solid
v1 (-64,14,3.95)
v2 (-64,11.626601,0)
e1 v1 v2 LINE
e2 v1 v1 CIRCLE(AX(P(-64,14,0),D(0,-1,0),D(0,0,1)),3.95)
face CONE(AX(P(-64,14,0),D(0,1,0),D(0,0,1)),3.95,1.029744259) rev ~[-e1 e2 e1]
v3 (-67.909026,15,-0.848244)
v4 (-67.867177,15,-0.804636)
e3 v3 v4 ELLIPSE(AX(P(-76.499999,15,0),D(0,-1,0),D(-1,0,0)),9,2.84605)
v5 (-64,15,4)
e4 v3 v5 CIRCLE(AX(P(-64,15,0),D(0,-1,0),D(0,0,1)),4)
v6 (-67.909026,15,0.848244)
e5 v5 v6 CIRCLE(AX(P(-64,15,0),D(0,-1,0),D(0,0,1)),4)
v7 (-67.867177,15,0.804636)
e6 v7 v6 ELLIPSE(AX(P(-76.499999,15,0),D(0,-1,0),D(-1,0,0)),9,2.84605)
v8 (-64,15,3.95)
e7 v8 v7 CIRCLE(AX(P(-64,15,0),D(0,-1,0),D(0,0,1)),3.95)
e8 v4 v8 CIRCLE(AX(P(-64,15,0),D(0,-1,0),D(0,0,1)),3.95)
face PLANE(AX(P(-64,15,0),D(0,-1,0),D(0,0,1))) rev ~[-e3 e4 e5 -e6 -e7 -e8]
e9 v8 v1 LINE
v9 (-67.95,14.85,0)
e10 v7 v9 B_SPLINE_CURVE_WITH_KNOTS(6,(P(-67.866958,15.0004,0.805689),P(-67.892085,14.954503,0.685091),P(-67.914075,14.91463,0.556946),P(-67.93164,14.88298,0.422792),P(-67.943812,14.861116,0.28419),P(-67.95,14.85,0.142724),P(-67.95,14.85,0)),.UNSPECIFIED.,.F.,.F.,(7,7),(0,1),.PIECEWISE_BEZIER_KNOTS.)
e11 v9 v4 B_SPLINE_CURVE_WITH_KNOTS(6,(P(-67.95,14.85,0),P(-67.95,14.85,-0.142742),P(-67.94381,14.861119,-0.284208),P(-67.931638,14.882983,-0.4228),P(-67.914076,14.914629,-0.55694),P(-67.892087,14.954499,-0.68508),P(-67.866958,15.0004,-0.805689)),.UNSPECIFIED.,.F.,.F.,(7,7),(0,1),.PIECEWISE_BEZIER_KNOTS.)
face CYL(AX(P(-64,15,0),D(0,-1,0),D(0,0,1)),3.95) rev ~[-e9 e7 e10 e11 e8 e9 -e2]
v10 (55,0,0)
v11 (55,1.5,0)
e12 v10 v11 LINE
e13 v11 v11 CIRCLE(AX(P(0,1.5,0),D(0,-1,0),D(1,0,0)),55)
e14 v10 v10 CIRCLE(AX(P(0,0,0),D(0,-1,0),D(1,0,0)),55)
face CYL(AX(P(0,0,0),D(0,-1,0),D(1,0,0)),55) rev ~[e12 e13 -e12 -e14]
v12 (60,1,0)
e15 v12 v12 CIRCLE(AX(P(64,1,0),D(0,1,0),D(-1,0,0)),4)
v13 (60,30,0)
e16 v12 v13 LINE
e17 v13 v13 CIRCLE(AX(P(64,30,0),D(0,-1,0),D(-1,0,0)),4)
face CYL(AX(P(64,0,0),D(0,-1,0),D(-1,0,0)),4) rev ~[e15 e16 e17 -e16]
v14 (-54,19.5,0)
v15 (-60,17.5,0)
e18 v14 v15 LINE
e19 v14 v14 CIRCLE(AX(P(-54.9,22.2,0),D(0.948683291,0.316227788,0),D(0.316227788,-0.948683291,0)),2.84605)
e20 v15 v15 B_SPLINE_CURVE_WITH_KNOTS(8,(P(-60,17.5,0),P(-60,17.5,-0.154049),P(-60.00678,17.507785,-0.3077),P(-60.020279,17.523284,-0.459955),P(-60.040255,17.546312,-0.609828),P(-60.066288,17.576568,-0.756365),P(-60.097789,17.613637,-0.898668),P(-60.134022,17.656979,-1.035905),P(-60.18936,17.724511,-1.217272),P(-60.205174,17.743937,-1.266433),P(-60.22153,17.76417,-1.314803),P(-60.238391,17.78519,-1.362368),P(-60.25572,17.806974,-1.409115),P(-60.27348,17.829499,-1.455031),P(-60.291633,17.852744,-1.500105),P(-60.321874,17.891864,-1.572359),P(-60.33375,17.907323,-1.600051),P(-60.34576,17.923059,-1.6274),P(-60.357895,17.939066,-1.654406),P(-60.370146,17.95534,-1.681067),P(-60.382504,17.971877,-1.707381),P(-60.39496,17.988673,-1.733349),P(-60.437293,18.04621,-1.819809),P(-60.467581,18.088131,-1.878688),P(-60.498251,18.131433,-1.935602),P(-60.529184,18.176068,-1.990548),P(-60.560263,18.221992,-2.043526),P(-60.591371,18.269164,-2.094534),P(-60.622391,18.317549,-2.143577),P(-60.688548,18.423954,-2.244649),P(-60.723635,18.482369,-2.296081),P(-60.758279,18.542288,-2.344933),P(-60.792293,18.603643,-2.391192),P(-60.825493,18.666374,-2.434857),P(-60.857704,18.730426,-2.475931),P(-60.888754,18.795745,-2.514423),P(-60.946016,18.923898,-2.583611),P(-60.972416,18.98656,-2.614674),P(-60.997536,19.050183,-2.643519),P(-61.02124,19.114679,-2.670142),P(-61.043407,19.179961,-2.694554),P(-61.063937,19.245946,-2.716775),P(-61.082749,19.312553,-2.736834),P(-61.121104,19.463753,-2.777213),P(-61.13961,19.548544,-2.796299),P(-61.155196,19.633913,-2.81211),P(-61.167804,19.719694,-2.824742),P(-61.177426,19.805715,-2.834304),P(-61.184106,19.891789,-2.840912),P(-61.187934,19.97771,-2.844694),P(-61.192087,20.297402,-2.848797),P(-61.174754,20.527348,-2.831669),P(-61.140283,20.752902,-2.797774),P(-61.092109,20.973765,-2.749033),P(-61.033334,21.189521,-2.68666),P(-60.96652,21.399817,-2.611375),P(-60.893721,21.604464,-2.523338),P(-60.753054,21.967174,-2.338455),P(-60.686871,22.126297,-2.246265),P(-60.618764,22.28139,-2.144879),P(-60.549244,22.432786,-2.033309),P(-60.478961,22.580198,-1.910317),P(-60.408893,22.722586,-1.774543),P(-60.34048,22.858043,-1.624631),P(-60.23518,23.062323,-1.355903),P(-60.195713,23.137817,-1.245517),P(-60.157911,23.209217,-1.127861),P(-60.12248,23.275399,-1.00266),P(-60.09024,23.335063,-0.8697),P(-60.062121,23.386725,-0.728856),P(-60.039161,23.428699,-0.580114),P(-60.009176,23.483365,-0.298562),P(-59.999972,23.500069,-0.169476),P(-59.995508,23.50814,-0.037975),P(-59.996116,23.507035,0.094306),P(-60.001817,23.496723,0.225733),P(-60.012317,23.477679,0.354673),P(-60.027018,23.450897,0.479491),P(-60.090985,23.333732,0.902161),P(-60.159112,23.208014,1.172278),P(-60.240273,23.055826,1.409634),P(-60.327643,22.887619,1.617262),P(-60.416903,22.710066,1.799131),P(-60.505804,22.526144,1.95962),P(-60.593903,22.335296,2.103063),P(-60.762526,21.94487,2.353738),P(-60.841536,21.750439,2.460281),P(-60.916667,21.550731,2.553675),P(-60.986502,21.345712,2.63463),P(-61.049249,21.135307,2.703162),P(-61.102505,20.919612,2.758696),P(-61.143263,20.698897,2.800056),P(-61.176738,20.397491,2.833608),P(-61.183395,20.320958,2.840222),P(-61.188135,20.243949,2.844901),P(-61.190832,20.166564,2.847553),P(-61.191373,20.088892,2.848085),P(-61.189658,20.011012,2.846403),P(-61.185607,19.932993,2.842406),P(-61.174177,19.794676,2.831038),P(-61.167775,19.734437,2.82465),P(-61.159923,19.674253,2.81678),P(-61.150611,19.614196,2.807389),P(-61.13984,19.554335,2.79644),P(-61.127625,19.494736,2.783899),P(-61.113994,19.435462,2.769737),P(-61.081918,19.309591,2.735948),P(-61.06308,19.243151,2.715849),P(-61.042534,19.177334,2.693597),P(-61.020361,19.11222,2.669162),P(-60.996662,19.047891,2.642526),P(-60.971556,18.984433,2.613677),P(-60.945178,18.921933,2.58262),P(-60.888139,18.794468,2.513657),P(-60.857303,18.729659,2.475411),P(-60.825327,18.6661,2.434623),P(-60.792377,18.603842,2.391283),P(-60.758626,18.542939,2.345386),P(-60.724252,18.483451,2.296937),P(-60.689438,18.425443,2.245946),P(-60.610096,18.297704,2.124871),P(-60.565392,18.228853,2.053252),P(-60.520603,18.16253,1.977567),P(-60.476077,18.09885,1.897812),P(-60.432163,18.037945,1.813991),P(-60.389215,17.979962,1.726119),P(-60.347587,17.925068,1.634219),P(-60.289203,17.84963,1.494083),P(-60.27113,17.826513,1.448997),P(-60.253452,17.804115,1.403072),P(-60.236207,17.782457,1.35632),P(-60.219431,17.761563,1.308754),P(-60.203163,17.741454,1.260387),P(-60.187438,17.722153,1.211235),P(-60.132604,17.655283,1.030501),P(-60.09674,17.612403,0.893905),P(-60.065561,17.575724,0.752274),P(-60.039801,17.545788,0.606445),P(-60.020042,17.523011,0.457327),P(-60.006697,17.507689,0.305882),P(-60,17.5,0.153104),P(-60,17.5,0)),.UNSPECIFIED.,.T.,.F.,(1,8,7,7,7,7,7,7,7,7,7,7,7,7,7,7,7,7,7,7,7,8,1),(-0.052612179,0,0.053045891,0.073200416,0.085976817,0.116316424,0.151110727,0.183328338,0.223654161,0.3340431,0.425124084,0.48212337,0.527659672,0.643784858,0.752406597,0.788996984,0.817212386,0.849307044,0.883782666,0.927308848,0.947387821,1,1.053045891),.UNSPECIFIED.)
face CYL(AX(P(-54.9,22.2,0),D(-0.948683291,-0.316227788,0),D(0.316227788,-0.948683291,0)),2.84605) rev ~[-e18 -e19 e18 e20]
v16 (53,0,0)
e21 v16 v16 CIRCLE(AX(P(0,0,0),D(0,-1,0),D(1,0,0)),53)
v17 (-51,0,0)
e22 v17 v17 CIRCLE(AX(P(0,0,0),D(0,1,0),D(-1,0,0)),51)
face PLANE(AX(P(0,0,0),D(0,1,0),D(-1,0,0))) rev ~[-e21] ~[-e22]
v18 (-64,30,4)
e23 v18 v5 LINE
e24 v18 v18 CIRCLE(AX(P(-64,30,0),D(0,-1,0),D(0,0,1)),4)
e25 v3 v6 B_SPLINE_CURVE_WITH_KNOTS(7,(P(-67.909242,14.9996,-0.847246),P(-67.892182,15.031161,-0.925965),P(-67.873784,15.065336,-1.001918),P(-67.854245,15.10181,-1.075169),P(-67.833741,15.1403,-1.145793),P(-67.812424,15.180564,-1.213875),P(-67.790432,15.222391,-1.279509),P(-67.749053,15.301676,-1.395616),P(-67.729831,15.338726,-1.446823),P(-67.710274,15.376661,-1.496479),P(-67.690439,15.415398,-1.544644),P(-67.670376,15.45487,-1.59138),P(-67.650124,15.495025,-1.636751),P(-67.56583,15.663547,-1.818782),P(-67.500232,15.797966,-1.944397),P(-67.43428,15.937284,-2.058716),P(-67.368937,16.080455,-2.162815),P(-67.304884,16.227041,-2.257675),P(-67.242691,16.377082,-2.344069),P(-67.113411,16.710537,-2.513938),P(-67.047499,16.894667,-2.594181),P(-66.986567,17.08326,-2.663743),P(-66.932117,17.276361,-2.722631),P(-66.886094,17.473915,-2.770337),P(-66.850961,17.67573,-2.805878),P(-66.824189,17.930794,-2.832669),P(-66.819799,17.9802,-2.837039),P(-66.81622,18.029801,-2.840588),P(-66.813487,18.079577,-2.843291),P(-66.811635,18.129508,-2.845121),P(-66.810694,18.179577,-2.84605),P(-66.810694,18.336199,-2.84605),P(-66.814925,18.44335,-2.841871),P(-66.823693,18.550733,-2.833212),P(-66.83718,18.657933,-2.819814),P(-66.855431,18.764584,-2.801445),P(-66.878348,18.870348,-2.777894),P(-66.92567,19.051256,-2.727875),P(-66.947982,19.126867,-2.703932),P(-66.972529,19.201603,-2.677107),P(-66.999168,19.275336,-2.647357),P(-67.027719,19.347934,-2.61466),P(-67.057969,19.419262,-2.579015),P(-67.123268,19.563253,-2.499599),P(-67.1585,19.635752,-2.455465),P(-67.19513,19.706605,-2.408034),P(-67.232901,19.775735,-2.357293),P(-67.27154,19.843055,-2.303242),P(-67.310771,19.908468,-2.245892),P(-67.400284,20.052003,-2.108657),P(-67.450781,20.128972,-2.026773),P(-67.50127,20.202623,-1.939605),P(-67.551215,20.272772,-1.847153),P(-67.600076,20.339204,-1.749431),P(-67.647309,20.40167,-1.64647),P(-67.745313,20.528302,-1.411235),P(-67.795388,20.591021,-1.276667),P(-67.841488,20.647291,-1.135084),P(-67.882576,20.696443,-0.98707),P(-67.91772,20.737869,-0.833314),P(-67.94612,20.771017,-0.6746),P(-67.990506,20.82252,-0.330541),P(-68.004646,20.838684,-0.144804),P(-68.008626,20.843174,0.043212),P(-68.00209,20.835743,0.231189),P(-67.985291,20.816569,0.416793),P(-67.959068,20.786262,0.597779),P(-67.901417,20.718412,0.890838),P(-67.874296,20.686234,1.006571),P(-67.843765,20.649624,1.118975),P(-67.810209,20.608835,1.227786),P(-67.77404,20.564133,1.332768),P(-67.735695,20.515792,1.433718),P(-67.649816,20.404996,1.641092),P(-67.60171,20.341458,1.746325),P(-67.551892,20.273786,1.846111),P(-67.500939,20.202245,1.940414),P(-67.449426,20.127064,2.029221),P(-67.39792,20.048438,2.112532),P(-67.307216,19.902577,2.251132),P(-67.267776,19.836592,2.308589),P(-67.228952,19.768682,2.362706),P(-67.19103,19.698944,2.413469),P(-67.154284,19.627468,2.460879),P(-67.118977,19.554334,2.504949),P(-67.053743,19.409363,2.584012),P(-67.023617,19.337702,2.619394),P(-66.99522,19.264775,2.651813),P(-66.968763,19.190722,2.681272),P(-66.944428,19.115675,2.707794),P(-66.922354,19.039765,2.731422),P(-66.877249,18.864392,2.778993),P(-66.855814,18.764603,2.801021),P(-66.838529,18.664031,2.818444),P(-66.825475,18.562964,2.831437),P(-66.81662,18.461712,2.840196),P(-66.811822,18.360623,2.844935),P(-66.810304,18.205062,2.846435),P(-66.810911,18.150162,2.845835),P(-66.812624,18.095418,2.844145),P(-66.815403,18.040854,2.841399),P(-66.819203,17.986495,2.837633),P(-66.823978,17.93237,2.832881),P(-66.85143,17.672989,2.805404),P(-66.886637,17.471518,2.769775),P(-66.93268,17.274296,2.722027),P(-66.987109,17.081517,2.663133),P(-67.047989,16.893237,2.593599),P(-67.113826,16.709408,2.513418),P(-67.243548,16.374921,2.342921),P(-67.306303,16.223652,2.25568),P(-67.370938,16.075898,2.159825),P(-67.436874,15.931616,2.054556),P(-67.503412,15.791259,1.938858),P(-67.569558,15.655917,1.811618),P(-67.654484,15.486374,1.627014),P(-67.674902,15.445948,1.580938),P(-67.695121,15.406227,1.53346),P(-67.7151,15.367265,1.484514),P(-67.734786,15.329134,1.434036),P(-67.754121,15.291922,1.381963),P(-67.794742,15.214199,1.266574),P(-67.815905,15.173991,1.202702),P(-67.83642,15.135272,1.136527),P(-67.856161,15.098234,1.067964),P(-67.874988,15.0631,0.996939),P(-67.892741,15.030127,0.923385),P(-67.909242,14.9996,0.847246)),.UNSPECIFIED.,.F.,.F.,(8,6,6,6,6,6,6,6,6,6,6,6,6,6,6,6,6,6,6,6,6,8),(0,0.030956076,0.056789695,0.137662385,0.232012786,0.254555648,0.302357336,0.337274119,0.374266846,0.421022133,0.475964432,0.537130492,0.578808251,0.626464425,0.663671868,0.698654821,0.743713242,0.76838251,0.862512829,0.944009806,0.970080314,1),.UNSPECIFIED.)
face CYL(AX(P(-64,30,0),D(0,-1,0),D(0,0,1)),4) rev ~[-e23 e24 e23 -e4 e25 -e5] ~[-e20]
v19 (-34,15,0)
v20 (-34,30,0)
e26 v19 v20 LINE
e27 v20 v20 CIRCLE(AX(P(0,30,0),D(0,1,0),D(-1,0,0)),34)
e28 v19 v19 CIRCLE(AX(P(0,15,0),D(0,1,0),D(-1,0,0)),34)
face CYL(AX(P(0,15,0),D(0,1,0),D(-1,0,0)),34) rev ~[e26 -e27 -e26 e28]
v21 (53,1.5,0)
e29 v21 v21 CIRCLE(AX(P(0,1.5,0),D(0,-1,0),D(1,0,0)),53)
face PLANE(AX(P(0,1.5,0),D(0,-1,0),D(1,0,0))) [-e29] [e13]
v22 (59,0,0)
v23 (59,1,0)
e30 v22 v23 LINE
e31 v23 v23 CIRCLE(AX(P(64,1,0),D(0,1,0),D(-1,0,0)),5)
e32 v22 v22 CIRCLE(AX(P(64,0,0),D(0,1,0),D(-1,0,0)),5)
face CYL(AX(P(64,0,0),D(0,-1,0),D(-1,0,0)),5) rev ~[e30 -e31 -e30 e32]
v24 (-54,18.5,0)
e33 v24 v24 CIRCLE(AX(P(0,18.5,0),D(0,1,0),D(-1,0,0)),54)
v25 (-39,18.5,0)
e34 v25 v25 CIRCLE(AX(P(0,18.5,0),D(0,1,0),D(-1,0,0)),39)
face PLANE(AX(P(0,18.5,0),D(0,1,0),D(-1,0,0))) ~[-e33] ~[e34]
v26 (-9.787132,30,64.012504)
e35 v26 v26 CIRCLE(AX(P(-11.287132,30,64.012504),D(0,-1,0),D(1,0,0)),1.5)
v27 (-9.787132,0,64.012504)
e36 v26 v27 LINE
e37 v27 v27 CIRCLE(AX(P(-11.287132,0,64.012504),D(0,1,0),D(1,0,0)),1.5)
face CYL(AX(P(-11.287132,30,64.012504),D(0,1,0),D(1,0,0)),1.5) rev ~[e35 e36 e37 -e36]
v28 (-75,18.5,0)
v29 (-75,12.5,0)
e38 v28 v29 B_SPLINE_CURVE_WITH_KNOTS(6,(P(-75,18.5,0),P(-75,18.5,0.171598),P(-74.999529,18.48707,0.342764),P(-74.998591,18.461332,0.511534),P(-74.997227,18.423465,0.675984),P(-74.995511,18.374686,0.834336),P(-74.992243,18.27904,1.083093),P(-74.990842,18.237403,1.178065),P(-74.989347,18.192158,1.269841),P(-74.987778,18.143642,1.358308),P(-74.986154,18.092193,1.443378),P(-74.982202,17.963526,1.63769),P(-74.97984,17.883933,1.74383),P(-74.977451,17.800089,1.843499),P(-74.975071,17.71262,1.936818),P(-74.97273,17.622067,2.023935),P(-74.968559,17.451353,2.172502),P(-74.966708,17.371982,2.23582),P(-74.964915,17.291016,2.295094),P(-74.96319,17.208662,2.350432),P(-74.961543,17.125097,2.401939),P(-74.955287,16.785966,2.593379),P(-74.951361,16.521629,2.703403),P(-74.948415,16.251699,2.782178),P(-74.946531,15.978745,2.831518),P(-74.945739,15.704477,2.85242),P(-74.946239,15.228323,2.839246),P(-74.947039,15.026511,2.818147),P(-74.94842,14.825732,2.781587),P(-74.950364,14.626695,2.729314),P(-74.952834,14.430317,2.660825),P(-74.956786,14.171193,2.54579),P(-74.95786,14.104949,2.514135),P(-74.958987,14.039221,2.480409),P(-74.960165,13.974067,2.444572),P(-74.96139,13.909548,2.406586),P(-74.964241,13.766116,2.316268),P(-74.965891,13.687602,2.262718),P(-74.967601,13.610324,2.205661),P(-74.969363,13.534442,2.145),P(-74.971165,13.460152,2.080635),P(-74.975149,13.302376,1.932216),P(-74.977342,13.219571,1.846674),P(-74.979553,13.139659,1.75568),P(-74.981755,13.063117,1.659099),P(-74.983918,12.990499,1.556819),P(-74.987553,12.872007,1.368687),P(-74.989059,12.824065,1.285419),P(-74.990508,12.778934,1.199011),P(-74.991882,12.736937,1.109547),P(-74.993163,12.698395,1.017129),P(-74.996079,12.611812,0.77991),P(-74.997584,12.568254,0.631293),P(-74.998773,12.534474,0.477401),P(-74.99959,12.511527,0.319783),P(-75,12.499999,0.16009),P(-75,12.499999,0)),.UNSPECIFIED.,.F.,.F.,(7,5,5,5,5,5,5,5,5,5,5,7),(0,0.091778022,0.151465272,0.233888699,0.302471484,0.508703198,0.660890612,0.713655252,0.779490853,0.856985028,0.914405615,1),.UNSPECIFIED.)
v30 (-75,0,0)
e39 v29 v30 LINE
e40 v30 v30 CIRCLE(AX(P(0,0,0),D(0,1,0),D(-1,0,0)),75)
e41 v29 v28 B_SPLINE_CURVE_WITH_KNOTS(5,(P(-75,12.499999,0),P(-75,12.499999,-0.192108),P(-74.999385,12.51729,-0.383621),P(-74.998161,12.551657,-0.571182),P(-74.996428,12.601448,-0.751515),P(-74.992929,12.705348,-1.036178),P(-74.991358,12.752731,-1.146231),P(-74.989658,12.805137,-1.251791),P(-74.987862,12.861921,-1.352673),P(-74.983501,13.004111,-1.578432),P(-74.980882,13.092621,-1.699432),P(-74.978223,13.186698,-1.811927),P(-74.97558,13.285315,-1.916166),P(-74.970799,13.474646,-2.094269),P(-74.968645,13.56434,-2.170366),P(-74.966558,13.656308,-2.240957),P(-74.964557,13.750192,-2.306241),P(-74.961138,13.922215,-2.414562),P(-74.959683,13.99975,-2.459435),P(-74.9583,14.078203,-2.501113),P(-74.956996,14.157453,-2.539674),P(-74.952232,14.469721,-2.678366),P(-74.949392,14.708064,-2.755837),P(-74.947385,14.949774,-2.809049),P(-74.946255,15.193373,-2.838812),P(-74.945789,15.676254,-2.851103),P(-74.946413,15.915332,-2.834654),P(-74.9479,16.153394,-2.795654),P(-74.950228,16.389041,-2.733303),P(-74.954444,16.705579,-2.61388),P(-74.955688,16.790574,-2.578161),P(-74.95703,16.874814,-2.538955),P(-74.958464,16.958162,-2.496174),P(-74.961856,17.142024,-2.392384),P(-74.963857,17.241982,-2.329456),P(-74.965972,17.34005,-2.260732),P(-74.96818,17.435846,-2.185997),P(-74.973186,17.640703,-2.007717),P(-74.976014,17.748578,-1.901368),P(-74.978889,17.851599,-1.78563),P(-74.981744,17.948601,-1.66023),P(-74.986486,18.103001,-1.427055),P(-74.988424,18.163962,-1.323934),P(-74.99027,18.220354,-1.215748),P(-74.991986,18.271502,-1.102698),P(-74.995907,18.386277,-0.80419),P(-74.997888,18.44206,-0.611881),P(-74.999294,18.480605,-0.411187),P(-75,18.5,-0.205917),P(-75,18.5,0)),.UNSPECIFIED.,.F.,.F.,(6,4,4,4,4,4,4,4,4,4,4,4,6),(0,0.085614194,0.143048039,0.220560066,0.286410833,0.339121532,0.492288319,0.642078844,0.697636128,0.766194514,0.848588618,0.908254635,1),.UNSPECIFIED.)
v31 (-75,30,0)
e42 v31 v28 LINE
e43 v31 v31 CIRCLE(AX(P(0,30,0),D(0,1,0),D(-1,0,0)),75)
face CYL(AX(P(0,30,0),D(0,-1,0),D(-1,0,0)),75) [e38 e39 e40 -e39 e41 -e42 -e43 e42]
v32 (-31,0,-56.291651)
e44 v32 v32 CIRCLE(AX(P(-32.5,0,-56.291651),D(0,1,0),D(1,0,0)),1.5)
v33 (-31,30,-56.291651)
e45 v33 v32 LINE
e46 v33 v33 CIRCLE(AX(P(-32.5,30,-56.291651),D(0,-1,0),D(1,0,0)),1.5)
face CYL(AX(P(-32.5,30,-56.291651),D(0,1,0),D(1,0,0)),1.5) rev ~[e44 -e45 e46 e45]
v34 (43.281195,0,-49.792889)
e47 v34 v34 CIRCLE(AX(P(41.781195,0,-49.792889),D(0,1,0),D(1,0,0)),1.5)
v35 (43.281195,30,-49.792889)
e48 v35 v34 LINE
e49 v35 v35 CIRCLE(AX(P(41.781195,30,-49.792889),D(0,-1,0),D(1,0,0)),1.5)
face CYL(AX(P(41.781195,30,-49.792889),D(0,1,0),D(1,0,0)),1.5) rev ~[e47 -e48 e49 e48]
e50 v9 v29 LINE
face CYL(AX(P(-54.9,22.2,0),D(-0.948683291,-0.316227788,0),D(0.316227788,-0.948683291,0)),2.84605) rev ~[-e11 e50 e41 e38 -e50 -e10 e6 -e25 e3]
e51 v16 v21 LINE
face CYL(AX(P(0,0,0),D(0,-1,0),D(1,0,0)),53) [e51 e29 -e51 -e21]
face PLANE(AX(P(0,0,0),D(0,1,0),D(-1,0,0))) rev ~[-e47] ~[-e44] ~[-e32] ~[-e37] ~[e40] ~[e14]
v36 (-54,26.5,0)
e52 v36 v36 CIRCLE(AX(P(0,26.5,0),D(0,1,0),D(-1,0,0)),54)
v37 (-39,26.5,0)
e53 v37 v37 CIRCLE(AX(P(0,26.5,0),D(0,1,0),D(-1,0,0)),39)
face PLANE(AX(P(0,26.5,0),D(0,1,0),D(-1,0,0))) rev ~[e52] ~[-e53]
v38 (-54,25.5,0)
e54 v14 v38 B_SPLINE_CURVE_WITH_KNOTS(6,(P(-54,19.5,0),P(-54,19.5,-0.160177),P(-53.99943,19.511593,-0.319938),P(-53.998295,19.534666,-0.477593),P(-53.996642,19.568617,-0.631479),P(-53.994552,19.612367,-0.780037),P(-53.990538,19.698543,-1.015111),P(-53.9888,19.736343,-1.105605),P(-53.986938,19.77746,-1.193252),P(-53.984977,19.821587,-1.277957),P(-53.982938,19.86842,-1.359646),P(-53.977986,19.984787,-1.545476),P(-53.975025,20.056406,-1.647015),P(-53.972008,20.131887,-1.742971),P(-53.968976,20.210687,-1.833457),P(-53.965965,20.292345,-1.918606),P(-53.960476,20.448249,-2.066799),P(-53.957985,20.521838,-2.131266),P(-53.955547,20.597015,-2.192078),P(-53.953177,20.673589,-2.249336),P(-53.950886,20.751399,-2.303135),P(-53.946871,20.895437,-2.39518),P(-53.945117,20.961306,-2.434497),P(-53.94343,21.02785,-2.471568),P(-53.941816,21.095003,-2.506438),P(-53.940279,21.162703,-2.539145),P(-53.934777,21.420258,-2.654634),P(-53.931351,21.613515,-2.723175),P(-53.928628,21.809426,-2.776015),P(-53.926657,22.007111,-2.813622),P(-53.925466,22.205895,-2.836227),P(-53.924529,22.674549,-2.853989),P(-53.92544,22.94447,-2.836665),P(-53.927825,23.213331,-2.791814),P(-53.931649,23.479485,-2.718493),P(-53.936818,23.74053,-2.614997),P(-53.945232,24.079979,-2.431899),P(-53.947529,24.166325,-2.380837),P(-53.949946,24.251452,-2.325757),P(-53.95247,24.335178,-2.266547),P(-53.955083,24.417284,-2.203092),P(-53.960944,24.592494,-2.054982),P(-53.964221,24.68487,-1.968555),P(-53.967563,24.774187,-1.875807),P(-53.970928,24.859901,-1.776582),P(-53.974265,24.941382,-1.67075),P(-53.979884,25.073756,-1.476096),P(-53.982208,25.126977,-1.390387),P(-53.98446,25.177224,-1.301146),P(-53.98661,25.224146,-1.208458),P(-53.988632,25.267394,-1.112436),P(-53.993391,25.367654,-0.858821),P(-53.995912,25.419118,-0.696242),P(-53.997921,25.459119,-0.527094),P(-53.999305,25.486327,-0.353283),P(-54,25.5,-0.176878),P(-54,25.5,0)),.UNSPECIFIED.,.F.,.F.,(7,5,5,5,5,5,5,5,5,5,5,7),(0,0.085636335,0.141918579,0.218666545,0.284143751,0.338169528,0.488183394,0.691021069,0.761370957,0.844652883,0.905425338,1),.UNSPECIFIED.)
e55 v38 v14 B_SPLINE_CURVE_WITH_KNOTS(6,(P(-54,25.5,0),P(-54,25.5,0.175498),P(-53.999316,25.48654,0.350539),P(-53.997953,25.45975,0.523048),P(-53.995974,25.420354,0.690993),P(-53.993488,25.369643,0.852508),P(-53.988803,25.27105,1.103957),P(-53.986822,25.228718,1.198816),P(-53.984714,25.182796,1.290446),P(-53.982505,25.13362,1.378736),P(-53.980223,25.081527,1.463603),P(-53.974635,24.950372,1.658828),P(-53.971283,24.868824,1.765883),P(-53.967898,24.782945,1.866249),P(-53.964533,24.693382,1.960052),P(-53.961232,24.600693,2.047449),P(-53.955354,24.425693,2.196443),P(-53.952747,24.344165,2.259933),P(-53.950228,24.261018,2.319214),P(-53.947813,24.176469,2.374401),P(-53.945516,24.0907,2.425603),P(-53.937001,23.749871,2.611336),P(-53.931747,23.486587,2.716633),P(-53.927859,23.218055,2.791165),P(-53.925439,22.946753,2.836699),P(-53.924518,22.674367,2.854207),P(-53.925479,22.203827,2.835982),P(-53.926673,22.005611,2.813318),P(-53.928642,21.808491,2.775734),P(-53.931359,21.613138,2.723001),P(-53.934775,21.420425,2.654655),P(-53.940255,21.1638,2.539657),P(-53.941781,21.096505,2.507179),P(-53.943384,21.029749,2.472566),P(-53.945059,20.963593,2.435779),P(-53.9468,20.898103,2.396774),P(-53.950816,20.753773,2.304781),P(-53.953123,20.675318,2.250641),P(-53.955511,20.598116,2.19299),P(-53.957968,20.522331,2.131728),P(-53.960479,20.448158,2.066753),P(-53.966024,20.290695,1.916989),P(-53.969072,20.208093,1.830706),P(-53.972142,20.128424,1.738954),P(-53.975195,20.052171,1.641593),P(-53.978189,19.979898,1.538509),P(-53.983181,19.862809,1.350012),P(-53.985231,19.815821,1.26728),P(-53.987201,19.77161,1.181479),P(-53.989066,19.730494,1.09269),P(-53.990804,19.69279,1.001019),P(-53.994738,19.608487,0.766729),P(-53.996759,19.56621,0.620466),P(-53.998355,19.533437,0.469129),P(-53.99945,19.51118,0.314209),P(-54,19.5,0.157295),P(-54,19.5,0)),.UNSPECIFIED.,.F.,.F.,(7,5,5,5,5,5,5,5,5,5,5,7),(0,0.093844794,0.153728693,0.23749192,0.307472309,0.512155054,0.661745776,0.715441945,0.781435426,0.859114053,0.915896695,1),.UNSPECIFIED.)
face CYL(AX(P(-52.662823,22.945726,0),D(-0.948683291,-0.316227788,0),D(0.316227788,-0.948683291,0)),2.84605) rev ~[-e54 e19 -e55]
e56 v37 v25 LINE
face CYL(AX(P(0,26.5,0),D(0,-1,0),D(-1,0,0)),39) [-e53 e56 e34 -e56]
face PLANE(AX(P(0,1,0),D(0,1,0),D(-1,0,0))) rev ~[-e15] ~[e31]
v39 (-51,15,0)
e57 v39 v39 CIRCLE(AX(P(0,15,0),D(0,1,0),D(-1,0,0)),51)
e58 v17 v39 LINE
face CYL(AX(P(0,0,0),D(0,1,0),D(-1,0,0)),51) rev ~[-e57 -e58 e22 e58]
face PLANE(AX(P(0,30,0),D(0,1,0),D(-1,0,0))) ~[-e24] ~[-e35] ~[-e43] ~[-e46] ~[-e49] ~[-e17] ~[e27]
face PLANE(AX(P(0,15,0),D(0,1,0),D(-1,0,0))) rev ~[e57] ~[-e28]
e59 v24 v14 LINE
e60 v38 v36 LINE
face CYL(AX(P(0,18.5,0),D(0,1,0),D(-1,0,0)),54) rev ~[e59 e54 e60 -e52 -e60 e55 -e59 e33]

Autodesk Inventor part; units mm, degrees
ref_plane "YZ Plane" through (0, 0, 0) normal (1, 0, 0) x (0, 1, 0)
ref_plane "XZ Plane" through (0, 0, 0) normal (0, 1, 0) x (-1, 0, 0)
ref_plane "XY Plane" through (0, 0, 0) normal (0, 0, 1) x (1, 0, 0)
sketch "Эскиз1" plane through (0, 0, 0) normal (0, 0, 1) x (1, 0, 0)
  line L0 (0, 0) -> (0, 20)
  line L1 (0, 0) -> (0, 24)
  line L2 (0, 0) -> (0, 30)
  line L3 (0, 30) -> (-75, 30)
  line L4 (-75, 30) -> (-75, 0)
  line L5 (-75, 0) -> (-51, 0)
  line L6 (-51, 0) -> (-51, 15)
  line L7 (-51, 15) -> (-34, 15)
  line L8 (-34, 15) -> (-34, 30)
  line L9 (-54, 26.5) -> (-39, 26.5)
  line L10 (-39, 26.5) -> (-39, 18.5)
  line L11 (-39, 18.5) -> (-54, 18.5)
  line L12 (-54, 18.5) -> (-54, 26.5)
  dimension "d20" = 30
  dimension "d21" = 75
  dimension "d22" = 24
  dimension "d23" = 15
  dimension "d24" = 17
  dimension "d46" = 8
  dimension "d47" = 3.5
revolve "Вращение1" add sketch "Эскиз1" angle 360 about axis through (0, 0, 0) along (0, 1, 0)
sketch "Эскиз2" plane through (0, 30, 0) normal (0, 1, 0) x (1, 0, 0)
  circle A0 centre (0, 0) radius 32
  circle A1 centre (0, 0) radius 69
  line L0 (0, 0) -> (41.781195, 49.792889)
  line L1 (0, 0) -> (65, 0) construction
  circle A2 centre (41.781195, 49.792889) radius 1.5
  line L2 (0, 0) -> (-32.5, 56.291651)
  line L3 (0, 0) -> (65, 0) construction
  circle A3 centre (-32.5, 56.291651) radius 1.5
  line L4 (0, 0) -> (-11.287132, -64.012504)
  line L5 (0, 0) -> (65, 0) construction
  circle A4 centre (-11.287132, -64.012504) radius 1.5
  dimension "d8" = 65
  dimension "d9" = 50
  dimension "d10" = 3
  dimension "d11" = 65
  dimension "d12" = 120
  dimension "d13" = 3
  dimension "d14" = 65
  dimension "d15" = 100
  dimension "d16" = 3
extrude "Выдавливание1" cut sketch "Эскиз2" against normal through all contours A2 | A3 | A4
sketch "Эскиз3" plane through (0, 0, 0) normal (0, 1, 0) x (-1, 0, 0)
  circle A0 centre (11.287132, 64.012504) radius 1.5
  circle A1 centre (-41.781195, -49.792889) radius 1.5
  circle A2 centre (32.5, -56.291651) radius 1.5
  circle A3 centre (0, 0) radius 75
  circle A4 centre (0, 0) radius 34
  circle A5 centre (-64, 0) radius 4
  dimension "d44" = 64
  dimension "d45" = 8
extrude "Выдавливание2" cut sketch "Эскиз3" along normal through all contours A5
sketch "Эскиз4" plane through (0, 0, 0) normal (0, 1, 0) x (-1, 0, 0)
  circle A0 centre (-64, 0) radius 4 projected
  circle A1 centre (-64, 0) radius 5
  point P0 (0, 0)
  dimension "d27" = 10
extrude "Выдавливание3" cut sketch "Эскиз4" along normal blind 1
sketch "Эскиз5" plane through (0, 30, 0) normal (0, 1, 0) x (-1, 0, 0)
  line L0 (0, 0) -> (64, 0)
  dimension "d30" = 64
hole "Отверстие1" at (-64, 30, 0) direction (0, -1, 0) diameter 7.9 depth 16 tip angle 118 counterbore diameter 8 counterbore depth 15
sketch "Эскиз6" plane through (0, 0, 0) normal (0, 0, 1) x (1, 0, 0)
  line L0 (-54, 18.5) -> (54, 18.5)
  line L1 (-60, 15) -> (-60, 30)
  line L2 (-54, 18.5) -> (-60, 18.5)
  line L3 (-60, 18.5) -> (-60, 20.5)
  line L4 (-60, 15) -> (-60, 30)
  line L5 (-60, 20.5) -> (-54, 22.5)
  line L6 (-54, 18.5) -> (-54, 26.5)
  line L7 (-54, 22.5) -> (-54, 19.5)
  line L8 (-54, 18.5) -> (-54, 26.5)
  line L9 (-54, 19.5) -> (-77.955347, 11.514884)
  line L10 (-77.955347, 11.514884) -> (-78.855347, 14.214884)
  line L11 (-78.855347, 14.214884) -> (-52.662823, 22.945726)
  line L12 (-52.662823, 22.945726) -> (-51.762823, 20.245726)
  line L13 (-51.762823, 20.245726) -> (-54, 19.5)
  point P0 (0, 0)
  dimension "d54" = 2
  dimension "d55" = 3
revolve "Вращение2" cut sketch "Эскиз6" angle 360 about axis through (-78.855347, 14.214884, 0) along (0.9486833, 0.3162278, 0) contours L1 L9 L10 L11 | L2 L9 L1 | L1 L5 L6 L9 L2 | L11 L12 L13 L6
sketch "Эскиз7" plane through (0, 0, 0) normal (0, -1, 0) x (1, 0, 0)
  circle A0 centre (0, 0) radius 53
  circle A1 centre (0, 0) radius 54 projected
  circle A2 centre (0, 0) radius 55
  dimension "d48" = 106
  dimension "d49" = 110
extrude "Выдавливание4" cut sketch "Эскиз7" against normal blind 1.5 contours A1 | A2
properties part number "Корпус сальника 1" material "Чугун, серый"
